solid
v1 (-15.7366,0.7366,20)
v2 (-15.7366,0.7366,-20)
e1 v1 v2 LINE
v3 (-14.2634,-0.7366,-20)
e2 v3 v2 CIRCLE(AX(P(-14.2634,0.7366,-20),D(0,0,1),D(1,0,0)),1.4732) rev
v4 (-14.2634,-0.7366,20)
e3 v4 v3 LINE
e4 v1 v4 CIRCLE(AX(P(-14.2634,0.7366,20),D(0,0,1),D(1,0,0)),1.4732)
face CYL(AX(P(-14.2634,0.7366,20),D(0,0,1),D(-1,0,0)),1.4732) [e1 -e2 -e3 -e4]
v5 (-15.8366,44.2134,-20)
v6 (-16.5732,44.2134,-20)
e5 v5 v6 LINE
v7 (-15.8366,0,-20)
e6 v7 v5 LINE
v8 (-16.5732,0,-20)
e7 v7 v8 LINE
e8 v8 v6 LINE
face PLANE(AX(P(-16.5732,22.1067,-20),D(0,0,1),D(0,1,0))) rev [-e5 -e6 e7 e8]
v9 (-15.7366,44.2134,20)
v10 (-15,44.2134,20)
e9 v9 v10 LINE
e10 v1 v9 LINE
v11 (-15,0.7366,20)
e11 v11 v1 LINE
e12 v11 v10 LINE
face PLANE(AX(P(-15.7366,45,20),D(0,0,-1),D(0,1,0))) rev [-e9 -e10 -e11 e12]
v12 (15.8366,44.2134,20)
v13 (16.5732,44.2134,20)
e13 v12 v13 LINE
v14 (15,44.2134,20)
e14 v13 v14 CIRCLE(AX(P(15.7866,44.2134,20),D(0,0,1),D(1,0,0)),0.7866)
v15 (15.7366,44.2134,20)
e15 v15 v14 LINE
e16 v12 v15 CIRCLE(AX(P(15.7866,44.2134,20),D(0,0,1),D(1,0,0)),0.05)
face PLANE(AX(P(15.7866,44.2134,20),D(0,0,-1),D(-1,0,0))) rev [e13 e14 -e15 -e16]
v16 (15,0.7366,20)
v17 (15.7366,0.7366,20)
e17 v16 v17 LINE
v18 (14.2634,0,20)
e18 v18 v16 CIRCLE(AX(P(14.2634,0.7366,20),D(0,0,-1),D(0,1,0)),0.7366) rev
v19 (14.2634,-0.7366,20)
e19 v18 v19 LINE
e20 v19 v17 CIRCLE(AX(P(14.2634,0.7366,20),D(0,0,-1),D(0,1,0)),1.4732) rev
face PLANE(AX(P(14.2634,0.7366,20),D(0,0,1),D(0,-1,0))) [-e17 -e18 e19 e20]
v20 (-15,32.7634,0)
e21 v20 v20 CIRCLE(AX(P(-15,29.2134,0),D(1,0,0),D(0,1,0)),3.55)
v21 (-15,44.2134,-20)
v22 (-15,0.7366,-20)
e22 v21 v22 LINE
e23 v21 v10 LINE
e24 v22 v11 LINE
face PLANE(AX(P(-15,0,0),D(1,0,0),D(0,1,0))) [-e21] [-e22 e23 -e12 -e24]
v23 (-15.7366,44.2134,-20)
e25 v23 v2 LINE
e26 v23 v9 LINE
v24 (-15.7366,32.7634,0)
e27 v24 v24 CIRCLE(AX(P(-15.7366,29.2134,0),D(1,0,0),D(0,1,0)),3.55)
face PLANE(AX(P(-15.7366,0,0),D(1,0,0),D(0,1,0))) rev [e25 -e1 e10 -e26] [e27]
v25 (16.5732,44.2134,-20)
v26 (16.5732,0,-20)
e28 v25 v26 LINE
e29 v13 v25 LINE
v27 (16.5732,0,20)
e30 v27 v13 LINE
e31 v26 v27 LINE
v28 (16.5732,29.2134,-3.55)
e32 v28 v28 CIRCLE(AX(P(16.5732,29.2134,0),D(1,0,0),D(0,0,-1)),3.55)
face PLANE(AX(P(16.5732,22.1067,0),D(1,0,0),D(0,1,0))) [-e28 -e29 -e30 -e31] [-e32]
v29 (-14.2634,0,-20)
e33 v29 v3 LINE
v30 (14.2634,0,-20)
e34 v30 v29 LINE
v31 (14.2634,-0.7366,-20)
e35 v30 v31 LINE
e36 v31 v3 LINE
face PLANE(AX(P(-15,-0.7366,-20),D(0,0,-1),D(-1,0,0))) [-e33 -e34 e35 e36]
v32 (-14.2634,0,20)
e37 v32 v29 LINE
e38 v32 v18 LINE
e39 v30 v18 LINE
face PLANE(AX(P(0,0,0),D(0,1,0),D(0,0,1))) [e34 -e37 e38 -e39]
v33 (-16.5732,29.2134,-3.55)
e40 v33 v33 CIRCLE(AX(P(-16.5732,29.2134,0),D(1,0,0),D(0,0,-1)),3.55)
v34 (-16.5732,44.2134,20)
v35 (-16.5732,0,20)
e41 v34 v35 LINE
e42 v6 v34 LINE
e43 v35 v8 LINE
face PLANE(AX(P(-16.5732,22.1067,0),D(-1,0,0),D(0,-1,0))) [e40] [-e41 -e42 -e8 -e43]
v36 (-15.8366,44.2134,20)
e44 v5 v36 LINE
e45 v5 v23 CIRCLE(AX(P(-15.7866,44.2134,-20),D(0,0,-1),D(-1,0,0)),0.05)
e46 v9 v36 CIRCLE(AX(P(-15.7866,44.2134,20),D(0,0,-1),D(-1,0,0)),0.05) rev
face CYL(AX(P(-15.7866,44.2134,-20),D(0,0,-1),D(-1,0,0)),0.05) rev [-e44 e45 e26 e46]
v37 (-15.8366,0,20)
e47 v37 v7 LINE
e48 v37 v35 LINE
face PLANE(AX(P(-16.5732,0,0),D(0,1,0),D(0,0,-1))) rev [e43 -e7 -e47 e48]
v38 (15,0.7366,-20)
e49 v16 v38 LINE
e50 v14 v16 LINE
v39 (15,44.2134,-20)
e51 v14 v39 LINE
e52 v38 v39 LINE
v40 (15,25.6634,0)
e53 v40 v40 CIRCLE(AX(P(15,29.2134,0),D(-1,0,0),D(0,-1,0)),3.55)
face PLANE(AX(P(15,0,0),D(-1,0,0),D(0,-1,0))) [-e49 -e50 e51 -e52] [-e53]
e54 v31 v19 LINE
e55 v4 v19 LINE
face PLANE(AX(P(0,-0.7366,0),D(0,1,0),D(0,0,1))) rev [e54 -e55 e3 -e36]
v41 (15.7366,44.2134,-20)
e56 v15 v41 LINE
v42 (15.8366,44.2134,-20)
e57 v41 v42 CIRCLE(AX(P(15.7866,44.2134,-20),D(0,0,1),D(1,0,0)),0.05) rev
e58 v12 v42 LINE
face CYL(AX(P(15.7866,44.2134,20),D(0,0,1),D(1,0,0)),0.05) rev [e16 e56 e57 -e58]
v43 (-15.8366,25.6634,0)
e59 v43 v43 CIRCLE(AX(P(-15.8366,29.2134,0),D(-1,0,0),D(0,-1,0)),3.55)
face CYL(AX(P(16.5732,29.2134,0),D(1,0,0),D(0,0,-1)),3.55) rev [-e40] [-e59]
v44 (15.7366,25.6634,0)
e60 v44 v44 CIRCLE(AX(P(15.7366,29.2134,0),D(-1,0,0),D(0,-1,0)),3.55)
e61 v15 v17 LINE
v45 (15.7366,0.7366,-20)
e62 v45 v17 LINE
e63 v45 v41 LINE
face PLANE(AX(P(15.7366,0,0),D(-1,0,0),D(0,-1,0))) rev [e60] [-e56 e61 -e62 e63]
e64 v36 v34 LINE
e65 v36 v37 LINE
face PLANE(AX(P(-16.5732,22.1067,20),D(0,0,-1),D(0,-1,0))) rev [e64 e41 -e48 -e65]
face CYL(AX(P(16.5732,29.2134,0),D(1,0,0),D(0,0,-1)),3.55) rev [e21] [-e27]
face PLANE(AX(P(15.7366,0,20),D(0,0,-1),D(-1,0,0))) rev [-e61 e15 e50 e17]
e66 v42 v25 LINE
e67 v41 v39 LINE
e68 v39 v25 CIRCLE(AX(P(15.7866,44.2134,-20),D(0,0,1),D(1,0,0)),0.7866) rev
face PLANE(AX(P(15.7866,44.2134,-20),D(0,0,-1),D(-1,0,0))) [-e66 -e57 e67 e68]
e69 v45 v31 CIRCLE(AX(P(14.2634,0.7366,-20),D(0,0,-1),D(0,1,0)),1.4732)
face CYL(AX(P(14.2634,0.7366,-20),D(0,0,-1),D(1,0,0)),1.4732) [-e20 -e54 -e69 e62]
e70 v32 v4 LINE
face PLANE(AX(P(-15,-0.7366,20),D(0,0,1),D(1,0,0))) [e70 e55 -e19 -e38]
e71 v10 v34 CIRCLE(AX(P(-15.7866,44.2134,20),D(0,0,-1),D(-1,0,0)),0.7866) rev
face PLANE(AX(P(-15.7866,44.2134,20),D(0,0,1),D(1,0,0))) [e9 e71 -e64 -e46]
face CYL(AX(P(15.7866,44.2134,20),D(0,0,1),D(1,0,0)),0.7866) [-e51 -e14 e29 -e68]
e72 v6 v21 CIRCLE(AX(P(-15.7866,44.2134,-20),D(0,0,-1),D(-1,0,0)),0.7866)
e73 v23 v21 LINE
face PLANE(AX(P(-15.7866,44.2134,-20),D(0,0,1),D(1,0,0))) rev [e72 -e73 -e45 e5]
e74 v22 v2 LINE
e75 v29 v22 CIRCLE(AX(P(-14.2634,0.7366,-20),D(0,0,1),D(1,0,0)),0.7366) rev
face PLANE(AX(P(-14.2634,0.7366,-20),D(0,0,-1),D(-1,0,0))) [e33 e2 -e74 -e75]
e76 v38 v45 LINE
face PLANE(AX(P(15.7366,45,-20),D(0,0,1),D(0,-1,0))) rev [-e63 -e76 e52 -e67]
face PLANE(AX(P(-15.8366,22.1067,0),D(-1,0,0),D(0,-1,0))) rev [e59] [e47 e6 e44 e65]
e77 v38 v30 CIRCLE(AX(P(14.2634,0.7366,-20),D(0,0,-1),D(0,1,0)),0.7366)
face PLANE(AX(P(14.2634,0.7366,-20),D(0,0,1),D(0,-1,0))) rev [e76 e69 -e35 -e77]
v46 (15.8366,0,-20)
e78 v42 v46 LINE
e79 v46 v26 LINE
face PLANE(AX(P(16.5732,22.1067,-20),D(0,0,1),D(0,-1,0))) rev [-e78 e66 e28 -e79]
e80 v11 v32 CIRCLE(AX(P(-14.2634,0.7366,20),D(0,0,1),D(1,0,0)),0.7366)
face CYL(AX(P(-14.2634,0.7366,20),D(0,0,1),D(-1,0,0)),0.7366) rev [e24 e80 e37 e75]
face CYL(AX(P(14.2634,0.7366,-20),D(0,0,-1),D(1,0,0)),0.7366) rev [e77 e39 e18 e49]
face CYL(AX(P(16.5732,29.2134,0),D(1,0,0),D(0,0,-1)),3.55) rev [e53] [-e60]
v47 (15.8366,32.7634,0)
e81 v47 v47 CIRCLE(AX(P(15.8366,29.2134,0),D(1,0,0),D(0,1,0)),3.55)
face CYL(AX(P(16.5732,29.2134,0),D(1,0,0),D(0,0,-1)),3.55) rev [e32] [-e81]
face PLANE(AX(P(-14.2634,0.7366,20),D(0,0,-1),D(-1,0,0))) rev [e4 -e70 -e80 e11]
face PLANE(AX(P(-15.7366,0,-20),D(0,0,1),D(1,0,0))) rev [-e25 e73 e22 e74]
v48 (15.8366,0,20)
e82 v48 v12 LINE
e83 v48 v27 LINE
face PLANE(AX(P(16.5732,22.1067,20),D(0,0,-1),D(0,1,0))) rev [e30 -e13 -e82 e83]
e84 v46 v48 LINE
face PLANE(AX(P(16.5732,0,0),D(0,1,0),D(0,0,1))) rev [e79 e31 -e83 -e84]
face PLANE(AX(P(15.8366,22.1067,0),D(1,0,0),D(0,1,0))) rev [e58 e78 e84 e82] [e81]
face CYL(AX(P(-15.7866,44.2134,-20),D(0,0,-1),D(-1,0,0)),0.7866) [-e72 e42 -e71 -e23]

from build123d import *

# Parameters (mm, degrees)
SKETCH1_W                      = 30
SKETCH1_H                      = 40
BASE_FLANGE1_DEPTH             = 0.7366
EDGE_FLANGE1_STRIP_W           = 4.4196
EDGE_FLANGE1_STRIP_H           = 0.7366
EDGE_FLANGE1_STRIP_CUT_DEPTH   = 40
EDGE_FLANGE1_STRIP_2_W         = 4.4196
EDGE_FLANGE1_STRIP_2_H         = 0.7366
EDGE_FLANGE1_STRIP_CUT_2_DEPTH = 40
EDGE_FLANGE1_DEPTH             = 40
EDGE_FLANGE1_BEND_DEPTH        = 40
HEM1_START                     = -20
HEM1_DEPTH                     = 40
HEM1_2_DEPTH                   = 40
F_7_1_7_1_DIAMETER_HOLE1_D     = 7.1


# Read off the part's stored shape, not the designer's step: Hem1
# Sheet-metal steps are written as plain solids
with BuildPart() as part:
    # Sketch1 → Base-Flange1 (new body)
    with BuildSketch(Plane(origin=(0, 0, 0), x_dir=(1, 0, 0), z_dir=(0, 1, 0))):
        Rectangle(SKETCH1_W, SKETCH1_H)
    extrude(amount=-BASE_FLANGE1_DEPTH)

    # Edge-Flange1 strip (across the edge) → Edge-Flange1 strip cut (cut)
    with BuildSketch(Plane(origin=(15, 0, 20), x_dir=(-1, 0, 0), z_dir=(0, 0, -1))):
        with Locations((-1.4732, -0.3683)):
            Rectangle(EDGE_FLANGE1_STRIP_W, EDGE_FLANGE1_STRIP_H)
    extrude(amount=EDGE_FLANGE1_STRIP_CUT_DEPTH, mode=Mode.SUBTRACT)

    # Edge-Flange1 strip 2 (across the edge) → Edge-Flange1 strip cut 2 (cut)
    with BuildSketch(Plane(origin=(-15, 0, -20), x_dir=(1, 0, 0), z_dir=(0, 0, 1))):
        with Locations((-1.4732, -0.3683)):
            Rectangle(EDGE_FLANGE1_STRIP_2_W, EDGE_FLANGE1_STRIP_2_H)
    extrude(amount=EDGE_FLANGE1_STRIP_CUT_2_DEPTH, mode=Mode.SUBTRACT)

    # Edge-Flange1 section (across the edge) → Edge-Flange1 (add)
    with BuildSketch(Plane(origin=(15, 0, 20), x_dir=(-1, 0, 0), z_dir=(0, 0, -1))):
        with BuildLine():
            Line((-0.7366, 0.7366), (-0.7366, 45))
            Line((-0.7366, 45), (0, 45))
            Line((0, 45), (0, 0.7366))
            ThreePointArc((0, 0.7366), (0.215745145, 0.215745145), (0.7366, 0))
            Line((0.7366, 0), (0.7366, -0.7366))
            ThreePointArc((0.7366, -0.7366), (-0.30510971, -0.30510971), (-0.7366, 0.7366))
        make_face()
    extrude(amount=EDGE_FLANGE1_DEPTH)

    # Edge-Flange1 section 2 (across the edge) → Edge-Flange1 bend (add)
    with BuildSketch(Plane(origin=(-15, 0, -20), x_dir=(1, 0, 0), z_dir=(0, 0, 1))):
        with BuildLine():
            Line((-0.7366, 0.7366), (-0.7366, 45))
            Line((-0.7366, 45), (0, 45))
            Line((0, 45), (0, 0.7366))
            ThreePointArc((0, 0.7366), (0.215745145, 0.215745145), (0.7366, 0))
            Line((0.7366, 0), (0.7366, -0.7366))
            ThreePointArc((0.7366, -0.7366), (-0.30510971, -0.30510971), (-0.7366, 0.7366))
        make_face()
    extrude(amount=EDGE_FLANGE1_BEND_DEPTH)

    # Hem1 outline → Hem1 (cut)
    with BuildSketch(Plane.XY.offset(HEM1_START)):
        with BuildLine():
            ThreePointArc((15, 44.2134), (15.212984467, 44.751642306), (15.7366, 44.998409274))
            Line((15.7366, 44.998409274), (15.7366, 45))
            Line((15.7366, 45), (15, 45))
            Line((15, 45), (15, 44.2134))
        make_face()
        with BuildLine():
            Line((-15.7366, 45), (-15.7366, 44.998409274))
            ThreePointArc((-15.7366, 44.998409274), (-15.212984467, 44.751642306), (-15, 44.2134))
            Line((-15, 44.2134), (-15, 45))
            Line((-15, 45), (-15.7366, 45))
        make_face()
    extrude(amount=HEM1_DEPTH, mode=Mode.SUBTRACT)

    # Hem1 2 outline → Hem1 2 (add)
    with BuildSketch(Plane.XY.offset(HEM1_START)):
        with BuildLine():
            Line((15.8366, 0), (16.5732, 0))
            Line((16.5732, 0), (16.5732, 44.2134))
            ThreePointArc((16.5732, 44.2134), (16.324842306, 44.787015533), (15.7366, 44.998409274))
            Line((15.7366, 44.998409274), (15.7366, 44.2134))
            ThreePointArc((15.7366, 44.2134), (15.7866, 44.2634), (15.8366, 44.2134))
            Line((15.8366, 44.2134), (15.8366, 0))
        make_face()
        with BuildLine():
            Line((-16.5732, 0), (-15.8366, 0))
            Line((-15.8366, 0), (-15.8366, 44.2134))
            ThreePointArc((-15.8366, 44.2134), (-15.7866, 44.2634), (-15.7366, 44.2134))
            Line((-15.7366, 44.2134), (-15.7366, 44.998409274))
            ThreePointArc((-15.7366, 44.998409274), (-16.324842306, 44.787015533), (-16.5732, 44.2134))
            Line((-16.5732, 44.2134), (-16.5732, 0))
        make_face()
    extrude(amount=HEM1_2_DEPTH)

    # Ø7.1 (7.1) Diameter Hole1 (through all)
    with Locations(Plane(origin=(16.5732, 0, 0), x_dir=(0, 0, -1), z_dir=(1, 0, 0))):
        with Locations((0, 29.2134)):
            Hole(F_7_1_7_1_DIAMETER_HOLE1_D / 2)


solid = part.part
